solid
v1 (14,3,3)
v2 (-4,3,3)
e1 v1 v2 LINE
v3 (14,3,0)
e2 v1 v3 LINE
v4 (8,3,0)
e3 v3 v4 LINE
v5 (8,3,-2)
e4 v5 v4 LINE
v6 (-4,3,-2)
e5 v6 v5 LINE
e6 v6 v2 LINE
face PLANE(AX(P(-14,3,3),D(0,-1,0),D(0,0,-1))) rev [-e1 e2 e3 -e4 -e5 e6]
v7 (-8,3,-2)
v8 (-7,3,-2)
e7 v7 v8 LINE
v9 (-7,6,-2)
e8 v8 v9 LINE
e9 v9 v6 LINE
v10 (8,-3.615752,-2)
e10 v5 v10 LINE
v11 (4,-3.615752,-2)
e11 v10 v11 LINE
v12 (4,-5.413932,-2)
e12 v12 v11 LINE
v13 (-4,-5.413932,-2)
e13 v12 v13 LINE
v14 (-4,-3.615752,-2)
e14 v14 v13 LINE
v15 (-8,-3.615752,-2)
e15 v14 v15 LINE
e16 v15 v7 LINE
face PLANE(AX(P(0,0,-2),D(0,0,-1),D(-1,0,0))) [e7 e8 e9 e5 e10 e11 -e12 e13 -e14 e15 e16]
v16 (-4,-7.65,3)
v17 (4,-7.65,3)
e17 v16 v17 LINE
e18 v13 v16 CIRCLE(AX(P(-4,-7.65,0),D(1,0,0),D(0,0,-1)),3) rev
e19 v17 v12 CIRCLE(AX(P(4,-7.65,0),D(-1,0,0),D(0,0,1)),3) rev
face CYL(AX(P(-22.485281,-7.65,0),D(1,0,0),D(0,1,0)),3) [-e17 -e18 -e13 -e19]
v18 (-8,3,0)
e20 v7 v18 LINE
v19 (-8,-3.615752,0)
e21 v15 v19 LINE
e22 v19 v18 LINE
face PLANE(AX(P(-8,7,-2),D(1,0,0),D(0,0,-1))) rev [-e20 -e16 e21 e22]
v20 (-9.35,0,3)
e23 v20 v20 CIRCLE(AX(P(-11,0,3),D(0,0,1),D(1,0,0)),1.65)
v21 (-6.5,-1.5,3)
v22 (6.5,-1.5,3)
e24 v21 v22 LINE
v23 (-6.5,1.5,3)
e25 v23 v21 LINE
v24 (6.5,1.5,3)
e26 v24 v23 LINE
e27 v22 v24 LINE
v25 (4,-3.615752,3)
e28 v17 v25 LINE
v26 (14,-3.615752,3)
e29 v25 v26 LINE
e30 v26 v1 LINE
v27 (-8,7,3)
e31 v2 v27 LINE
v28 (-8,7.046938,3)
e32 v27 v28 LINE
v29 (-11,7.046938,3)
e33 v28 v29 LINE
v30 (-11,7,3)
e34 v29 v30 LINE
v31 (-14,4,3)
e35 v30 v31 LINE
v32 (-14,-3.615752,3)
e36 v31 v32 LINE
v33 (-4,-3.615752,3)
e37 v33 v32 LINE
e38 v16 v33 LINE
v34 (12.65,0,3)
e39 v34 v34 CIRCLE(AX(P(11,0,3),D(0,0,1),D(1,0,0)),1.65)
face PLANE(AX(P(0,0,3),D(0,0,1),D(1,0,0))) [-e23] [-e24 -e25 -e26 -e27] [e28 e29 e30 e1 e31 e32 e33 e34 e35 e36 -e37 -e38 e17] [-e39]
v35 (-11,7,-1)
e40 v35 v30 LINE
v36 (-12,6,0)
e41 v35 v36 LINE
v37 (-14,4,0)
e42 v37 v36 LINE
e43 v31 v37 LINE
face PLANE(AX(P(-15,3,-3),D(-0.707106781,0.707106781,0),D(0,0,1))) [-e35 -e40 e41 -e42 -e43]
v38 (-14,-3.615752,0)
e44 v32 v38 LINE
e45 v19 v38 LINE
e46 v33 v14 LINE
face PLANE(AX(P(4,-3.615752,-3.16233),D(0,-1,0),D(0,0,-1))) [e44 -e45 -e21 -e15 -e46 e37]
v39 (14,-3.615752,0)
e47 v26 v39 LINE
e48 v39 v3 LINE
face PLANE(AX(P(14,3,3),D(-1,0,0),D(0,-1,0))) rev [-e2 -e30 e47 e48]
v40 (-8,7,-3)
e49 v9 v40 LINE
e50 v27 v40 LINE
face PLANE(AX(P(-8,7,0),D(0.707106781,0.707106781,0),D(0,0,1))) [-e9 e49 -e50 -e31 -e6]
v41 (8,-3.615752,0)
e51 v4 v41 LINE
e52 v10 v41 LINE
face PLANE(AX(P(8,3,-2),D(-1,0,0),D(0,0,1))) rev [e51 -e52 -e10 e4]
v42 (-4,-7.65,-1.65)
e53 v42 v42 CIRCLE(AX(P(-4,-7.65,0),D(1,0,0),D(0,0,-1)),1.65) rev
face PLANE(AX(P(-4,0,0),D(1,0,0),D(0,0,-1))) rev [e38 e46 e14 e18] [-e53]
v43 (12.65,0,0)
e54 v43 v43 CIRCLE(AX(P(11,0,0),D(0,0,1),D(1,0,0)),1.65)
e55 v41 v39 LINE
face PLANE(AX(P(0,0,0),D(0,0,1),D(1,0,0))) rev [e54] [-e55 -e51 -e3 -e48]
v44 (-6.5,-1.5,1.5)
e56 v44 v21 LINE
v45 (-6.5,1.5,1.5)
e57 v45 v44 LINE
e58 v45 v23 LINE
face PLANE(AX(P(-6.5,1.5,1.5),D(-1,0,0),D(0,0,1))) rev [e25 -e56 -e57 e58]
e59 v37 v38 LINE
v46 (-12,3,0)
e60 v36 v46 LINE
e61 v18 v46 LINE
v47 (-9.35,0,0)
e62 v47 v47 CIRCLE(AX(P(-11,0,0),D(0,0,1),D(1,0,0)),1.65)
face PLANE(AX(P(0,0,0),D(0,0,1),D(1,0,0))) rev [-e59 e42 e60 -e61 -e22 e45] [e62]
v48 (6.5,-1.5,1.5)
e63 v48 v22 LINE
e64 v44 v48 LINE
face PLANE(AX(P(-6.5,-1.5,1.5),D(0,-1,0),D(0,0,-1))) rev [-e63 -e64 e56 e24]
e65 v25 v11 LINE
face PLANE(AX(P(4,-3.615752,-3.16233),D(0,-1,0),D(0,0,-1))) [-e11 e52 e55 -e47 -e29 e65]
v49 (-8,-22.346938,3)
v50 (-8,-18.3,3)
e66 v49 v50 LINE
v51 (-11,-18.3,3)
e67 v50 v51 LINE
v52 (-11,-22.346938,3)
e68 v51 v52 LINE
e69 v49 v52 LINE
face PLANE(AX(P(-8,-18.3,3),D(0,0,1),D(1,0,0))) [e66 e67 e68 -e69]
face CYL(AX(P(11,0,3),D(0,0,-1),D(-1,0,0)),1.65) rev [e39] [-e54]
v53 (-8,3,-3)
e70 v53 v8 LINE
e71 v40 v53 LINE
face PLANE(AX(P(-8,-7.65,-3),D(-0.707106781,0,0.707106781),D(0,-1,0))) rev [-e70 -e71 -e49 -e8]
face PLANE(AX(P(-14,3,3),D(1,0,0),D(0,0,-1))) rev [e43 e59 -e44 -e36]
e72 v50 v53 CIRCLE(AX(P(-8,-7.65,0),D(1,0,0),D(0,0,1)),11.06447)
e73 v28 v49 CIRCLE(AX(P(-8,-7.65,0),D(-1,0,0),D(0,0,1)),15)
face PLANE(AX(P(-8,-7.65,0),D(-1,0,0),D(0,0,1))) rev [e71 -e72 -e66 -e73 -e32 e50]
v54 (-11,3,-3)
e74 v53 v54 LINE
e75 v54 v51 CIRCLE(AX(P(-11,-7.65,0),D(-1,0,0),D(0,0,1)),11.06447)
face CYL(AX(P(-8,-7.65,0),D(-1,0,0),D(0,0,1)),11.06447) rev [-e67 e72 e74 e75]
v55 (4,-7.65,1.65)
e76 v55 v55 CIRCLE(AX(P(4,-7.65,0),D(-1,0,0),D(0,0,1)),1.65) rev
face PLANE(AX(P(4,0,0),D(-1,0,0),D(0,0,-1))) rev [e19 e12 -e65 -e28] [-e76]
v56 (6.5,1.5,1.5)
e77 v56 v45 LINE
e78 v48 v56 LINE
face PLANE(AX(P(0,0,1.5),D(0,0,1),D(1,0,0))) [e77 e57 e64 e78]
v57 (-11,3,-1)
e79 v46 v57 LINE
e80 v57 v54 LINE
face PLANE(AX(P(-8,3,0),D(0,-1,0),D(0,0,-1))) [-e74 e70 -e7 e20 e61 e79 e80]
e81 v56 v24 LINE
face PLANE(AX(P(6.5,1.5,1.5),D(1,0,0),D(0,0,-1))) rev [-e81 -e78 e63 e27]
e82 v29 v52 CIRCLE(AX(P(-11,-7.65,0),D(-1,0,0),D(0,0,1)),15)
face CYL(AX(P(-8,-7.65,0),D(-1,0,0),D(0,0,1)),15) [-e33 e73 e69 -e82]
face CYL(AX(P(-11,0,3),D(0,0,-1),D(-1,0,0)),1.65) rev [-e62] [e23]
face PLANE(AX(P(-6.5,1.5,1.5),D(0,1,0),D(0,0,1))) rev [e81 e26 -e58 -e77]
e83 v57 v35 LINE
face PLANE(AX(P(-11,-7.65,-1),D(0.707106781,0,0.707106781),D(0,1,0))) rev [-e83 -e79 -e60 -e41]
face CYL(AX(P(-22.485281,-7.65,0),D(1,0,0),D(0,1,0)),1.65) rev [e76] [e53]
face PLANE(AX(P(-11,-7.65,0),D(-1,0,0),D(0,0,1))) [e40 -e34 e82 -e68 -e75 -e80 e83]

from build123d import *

# Parameters (mm, degrees)
SZKIC1_W                    = 28
SZKIC1_H                    = 6
SZKIC1_R                    = 1.65
DODANIE_WYCI_GNI_CIE1_DEPTH = 3
SZKIC2_W                    = 28
SZKIC2_H                    = 3
DODANIE_WYCI_GNI_CIE2_DEPTH = 3
SZKIC3_R                    = 1.65
DODANIE_WYCI_GNI_CIE4_DEPTH = 28
WYTNIJ_WYCI_GNI_CIE2_DEPTH  = 10
SFAZOWANIE1_START           = -14
SFAZOWANIE1_DEPTH           = 28
SFAZOWANIE1_START_2         = -4
SFAZOWANIE1_2_DEPTH         = 8
SZKIC5_W                    = 0.893182681
SZKIC5_H                    = 1.710314622
WYTNIJ_WYCI_GNI_CIE3_DEPTH  = 10
SZKIC6_W                    = 13
SZKIC6_H                    = 3
WYTNIJ_WYCI_GNI_CIE4_DEPTH  = 1.5
DODANIE_WYCI_GNI_CIE5_DEPTH = 6
SZKIC9_R                    = 15
WYTNIJ_WYCI_GNI_CIE5_DEPTH  = 3
SFAZOWANIE2_SIZE            = 4
SFAZOWANIE3_SIZE            = 4
DODANIE_WYCI_GNI_CIE6_DEPTH = 2
SFAZOWANIE4_SIZE            = 1
SFAZOWANIE5_SIZE            = 1
DODANIE_WYCI_GNI_CIE7_DEPTH = 8


with BuildPart() as part:
    # Szkic1 → Dodanie-wyciągnięcie1 (new body)
    with BuildSketch(Plane.XY):
        Rectangle(SZKIC1_W, SZKIC1_H)
        with Locations((11, 0)):
            Circle(SZKIC1_R, mode=Mode.SUBTRACT)
        with Locations((-11, 0)):
            Circle(SZKIC1_R, mode=Mode.SUBTRACT)
    extrude(amount=DODANIE_WYCI_GNI_CIE1_DEPTH)

    # Szkic2 → Dodanie-wyciągnięcie2 (add)
    with BuildSketch(Plane.XZ.offset(3)):
        with Locations((0, 1.5)):
            Rectangle(SZKIC2_W, SZKIC2_H)
    extrude(amount=DODANIE_WYCI_GNI_CIE2_DEPTH)

    # Szkic3 → Dodanie-wyciągnięcie4 (add)
    with BuildSketch(Plane(origin=(14, 0, 0), x_dir=(0, 0, -1), z_dir=(1, 0, 0))):
        with BuildLine():
            Line((0, -4.65), (-3, -4.65))
            Line((-3, -4.65), (-3, -7.65))
            ThreePointArc((-3, -7.65), (2.121320344, -9.771320344), (0, -4.65))
        make_face()
        with Locations(Location((0, -7.65, 0), (0, 0, 90))):
            Circle(SZKIC3_R, mode=Mode.SUBTRACT)
    extrude(amount=-DODANIE_WYCI_GNI_CIE4_DEPTH)

    # Szkic4 → Wytnij-wyciągnięcie2 (cut)
    with BuildSketch(Plane.ZY.offset(14)):
        Polygon((-3.162330393, -4.65), (-3.162330393, -3.615751975), (3, -3.615751975), (3, -4.65), (3, -10.796501094), (-3.162330393, -10.796501094), align=None)
    wytnij_wyci_gni_cie2 = extrude(amount=-WYTNIJ_WYCI_GNI_CIE2_DEPTH, mode=Mode.SUBTRACT)

    # Lustro1: Wytnij-wyciągnięcie2 across plane
    add(wytnij_wyci_gni_cie2.mirror(Plane(origin=(0, 0, 0), x_dir=(0, 0, 1), z_dir=(1, 0, 0))), mode=Mode.SUBTRACT)

    # Sfazowanie1: read off the stored shape, not the designer's step
    # Sfazowanie1 outline → Sfazowanie1 (add)
    with BuildSketch(Plane.YZ.offset(SFAZOWANIE1_START)):
        Polygon((-3.615751975, 0), (-3.615751975, -0.893182681), (-1.905437353, 0), align=None)
    extrude(amount=SFAZOWANIE1_DEPTH)

    # Sfazowanie1 2 outline → Sfazowanie1 2 (add)
    with BuildSketch(Plane.YZ.offset(SFAZOWANIE1_START_2)):
        with BuildLine():
            Line((-5.18804458, -1.714285714), (-3.615751975, -0.893182681))
            Line((-3.615751975, -0.893182681), (-3.615751975, 0))
            Line((-3.615751975, 0), (-4.65, 0))
            ThreePointArc((-4.65, 0), (-4.787669982, -0.898369005), (-5.18804458, -1.714285714))
        make_face()
    extrude(amount=SFAZOWANIE1_2_DEPTH)

    # Szkic5 → Wytnij-wyciągnięcie3 (cut)
    with BuildSketch(Plane(origin=(14, 0, 0), x_dir=(0, 0, -1), z_dir=(1, 0, 0))):
        with Locations((0.446591341, -2.760594664)):
            Rectangle(SZKIC5_W, SZKIC5_H)
    wytnij_wyci_gni_cie3 = extrude(amount=-WYTNIJ_WYCI_GNI_CIE3_DEPTH, mode=Mode.SUBTRACT)

    # Lustro2: Wytnij-wyciągnięcie3 across plane
    add(wytnij_wyci_gni_cie3.mirror(Plane(origin=(0, 0, 0), x_dir=(0, 0, 1), z_dir=(1, 0, 0))), mode=Mode.SUBTRACT)

    # Szkic6 → Wytnij-wyciągnięcie4 (cut)
    with BuildSketch(Plane.XY.offset(3)):
        Rectangle(SZKIC6_W, SZKIC6_H)
    extrude(amount=-WYTNIJ_WYCI_GNI_CIE4_DEPTH, mode=Mode.SUBTRACT)

    # Szkic8 → Dodanie-wyciągnięcie5 (add)
    with BuildSketch(Plane.ZY.offset(14)):
        with BuildLine():
            Line((3, 3), (3, 7.046938457))
            ThreePointArc((3, 7.046938457), (-15, -7.65), (3, -22.346938457))
            Line((3, -22.346938457), (3, -18.3))
            ThreePointArc((3, -18.3), (-10.65, -10.65), (-3, 3))
            Line((-3, 3), (0, 3))
            Line((0, 3), (3, 3))
        make_face()
    extrude(amount=-DODANIE_WYCI_GNI_CIE5_DEPTH)

    # Szkic9 → Wytnij-wyciągnięcie5 (cut)
    with BuildSketch(Plane.ZY.offset(14)):
        with Locations((0, -7.65)):
            Circle(SZKIC9_R)
        with BuildLine():
            Line((-3, 3), (3, 3))
            ThreePointArc((3, 3), (0, -18.714470164), (-3, 3))
        make_face(mode=Mode.SUBTRACT)
    extrude(amount=-WYTNIJ_WYCI_GNI_CIE5_DEPTH, mode=Mode.SUBTRACT)

    # Sfazowanie2
    sfazowanie2_edges = [part.edges().sort_by_distance(p)[0] for p in [
        (-8, 3, 1.5),
    ]]
    chamfer(sfazowanie2_edges, length=SFAZOWANIE2_SIZE)

    # Sfazowanie3
    # the kernel refuses this chamfer: 4 mm, written as the material it adds along each edge
    with BuildSketch(Plane(origin=(-11, 3, 0), x_dir=(-1, 0, 0), z_dir=(0, 0, 1))) as sfazowanie3_piece_1_section:
        Polygon((SFAZOWANIE3_SIZE, 0), (0, -SFAZOWANIE3_SIZE), (0, 0), align=None)
    sfazowanie3_piece_1 = extrude(amount=3, mode=Mode.PRIVATE)
    sfazowanie3_piece_1 = split(sfazowanie3_piece_1, bisect_by=Plane(origin=(-14, 3, 0), z_dir=(1, 0, 0)), keep=Keep.TOP, mode=Mode.PRIVATE)
    add(sfazowanie3_piece_1)

    # Szkic10 → Dodanie-wyciągnięcie6 (add)
    with BuildSketch(Plane(origin=(0, 0, 0), x_dir=(-1, 0, 0), z_dir=(0, 0, -1))):
        Polygon((-8, 3), (-8, -3.615751975), (8, -3.615751975), (8, 3.615751975), (8, 7), (4, 3), align=None)
    extrude(amount=DODANIE_WYCI_GNI_CIE6_DEPTH)

    # Sfazowanie4
    sfazowanie4_edges = [part.edges().sort_by_distance(p)[0] for p in [
        (-8, 5, -2),
    ]]
    chamfer(sfazowanie4_edges, length=SFAZOWANIE4_SIZE)

    # Sfazowanie5
    sfazowanie5_edges = [part.edges().sort_by_distance(p)[0] for p in [
        (-11, 5, 0),
    ]]
    chamfer(sfazowanie5_edges, length=SFAZOWANIE5_SIZE)

    # Szkic11 → Dodanie-wyciągnięcie7 (add)
    with BuildSketch(Plane(origin=(4, 0, 0), x_dir=(0, 0, -1), z_dir=(1, 0, 0))):
        Polygon((2, -3.615751975), (2, -5.632292806), (0.35679852, -3.615751975), align=None)
    extrude(amount=-DODANIE_WYCI_GNI_CIE7_DEPTH)


solid = part.part
